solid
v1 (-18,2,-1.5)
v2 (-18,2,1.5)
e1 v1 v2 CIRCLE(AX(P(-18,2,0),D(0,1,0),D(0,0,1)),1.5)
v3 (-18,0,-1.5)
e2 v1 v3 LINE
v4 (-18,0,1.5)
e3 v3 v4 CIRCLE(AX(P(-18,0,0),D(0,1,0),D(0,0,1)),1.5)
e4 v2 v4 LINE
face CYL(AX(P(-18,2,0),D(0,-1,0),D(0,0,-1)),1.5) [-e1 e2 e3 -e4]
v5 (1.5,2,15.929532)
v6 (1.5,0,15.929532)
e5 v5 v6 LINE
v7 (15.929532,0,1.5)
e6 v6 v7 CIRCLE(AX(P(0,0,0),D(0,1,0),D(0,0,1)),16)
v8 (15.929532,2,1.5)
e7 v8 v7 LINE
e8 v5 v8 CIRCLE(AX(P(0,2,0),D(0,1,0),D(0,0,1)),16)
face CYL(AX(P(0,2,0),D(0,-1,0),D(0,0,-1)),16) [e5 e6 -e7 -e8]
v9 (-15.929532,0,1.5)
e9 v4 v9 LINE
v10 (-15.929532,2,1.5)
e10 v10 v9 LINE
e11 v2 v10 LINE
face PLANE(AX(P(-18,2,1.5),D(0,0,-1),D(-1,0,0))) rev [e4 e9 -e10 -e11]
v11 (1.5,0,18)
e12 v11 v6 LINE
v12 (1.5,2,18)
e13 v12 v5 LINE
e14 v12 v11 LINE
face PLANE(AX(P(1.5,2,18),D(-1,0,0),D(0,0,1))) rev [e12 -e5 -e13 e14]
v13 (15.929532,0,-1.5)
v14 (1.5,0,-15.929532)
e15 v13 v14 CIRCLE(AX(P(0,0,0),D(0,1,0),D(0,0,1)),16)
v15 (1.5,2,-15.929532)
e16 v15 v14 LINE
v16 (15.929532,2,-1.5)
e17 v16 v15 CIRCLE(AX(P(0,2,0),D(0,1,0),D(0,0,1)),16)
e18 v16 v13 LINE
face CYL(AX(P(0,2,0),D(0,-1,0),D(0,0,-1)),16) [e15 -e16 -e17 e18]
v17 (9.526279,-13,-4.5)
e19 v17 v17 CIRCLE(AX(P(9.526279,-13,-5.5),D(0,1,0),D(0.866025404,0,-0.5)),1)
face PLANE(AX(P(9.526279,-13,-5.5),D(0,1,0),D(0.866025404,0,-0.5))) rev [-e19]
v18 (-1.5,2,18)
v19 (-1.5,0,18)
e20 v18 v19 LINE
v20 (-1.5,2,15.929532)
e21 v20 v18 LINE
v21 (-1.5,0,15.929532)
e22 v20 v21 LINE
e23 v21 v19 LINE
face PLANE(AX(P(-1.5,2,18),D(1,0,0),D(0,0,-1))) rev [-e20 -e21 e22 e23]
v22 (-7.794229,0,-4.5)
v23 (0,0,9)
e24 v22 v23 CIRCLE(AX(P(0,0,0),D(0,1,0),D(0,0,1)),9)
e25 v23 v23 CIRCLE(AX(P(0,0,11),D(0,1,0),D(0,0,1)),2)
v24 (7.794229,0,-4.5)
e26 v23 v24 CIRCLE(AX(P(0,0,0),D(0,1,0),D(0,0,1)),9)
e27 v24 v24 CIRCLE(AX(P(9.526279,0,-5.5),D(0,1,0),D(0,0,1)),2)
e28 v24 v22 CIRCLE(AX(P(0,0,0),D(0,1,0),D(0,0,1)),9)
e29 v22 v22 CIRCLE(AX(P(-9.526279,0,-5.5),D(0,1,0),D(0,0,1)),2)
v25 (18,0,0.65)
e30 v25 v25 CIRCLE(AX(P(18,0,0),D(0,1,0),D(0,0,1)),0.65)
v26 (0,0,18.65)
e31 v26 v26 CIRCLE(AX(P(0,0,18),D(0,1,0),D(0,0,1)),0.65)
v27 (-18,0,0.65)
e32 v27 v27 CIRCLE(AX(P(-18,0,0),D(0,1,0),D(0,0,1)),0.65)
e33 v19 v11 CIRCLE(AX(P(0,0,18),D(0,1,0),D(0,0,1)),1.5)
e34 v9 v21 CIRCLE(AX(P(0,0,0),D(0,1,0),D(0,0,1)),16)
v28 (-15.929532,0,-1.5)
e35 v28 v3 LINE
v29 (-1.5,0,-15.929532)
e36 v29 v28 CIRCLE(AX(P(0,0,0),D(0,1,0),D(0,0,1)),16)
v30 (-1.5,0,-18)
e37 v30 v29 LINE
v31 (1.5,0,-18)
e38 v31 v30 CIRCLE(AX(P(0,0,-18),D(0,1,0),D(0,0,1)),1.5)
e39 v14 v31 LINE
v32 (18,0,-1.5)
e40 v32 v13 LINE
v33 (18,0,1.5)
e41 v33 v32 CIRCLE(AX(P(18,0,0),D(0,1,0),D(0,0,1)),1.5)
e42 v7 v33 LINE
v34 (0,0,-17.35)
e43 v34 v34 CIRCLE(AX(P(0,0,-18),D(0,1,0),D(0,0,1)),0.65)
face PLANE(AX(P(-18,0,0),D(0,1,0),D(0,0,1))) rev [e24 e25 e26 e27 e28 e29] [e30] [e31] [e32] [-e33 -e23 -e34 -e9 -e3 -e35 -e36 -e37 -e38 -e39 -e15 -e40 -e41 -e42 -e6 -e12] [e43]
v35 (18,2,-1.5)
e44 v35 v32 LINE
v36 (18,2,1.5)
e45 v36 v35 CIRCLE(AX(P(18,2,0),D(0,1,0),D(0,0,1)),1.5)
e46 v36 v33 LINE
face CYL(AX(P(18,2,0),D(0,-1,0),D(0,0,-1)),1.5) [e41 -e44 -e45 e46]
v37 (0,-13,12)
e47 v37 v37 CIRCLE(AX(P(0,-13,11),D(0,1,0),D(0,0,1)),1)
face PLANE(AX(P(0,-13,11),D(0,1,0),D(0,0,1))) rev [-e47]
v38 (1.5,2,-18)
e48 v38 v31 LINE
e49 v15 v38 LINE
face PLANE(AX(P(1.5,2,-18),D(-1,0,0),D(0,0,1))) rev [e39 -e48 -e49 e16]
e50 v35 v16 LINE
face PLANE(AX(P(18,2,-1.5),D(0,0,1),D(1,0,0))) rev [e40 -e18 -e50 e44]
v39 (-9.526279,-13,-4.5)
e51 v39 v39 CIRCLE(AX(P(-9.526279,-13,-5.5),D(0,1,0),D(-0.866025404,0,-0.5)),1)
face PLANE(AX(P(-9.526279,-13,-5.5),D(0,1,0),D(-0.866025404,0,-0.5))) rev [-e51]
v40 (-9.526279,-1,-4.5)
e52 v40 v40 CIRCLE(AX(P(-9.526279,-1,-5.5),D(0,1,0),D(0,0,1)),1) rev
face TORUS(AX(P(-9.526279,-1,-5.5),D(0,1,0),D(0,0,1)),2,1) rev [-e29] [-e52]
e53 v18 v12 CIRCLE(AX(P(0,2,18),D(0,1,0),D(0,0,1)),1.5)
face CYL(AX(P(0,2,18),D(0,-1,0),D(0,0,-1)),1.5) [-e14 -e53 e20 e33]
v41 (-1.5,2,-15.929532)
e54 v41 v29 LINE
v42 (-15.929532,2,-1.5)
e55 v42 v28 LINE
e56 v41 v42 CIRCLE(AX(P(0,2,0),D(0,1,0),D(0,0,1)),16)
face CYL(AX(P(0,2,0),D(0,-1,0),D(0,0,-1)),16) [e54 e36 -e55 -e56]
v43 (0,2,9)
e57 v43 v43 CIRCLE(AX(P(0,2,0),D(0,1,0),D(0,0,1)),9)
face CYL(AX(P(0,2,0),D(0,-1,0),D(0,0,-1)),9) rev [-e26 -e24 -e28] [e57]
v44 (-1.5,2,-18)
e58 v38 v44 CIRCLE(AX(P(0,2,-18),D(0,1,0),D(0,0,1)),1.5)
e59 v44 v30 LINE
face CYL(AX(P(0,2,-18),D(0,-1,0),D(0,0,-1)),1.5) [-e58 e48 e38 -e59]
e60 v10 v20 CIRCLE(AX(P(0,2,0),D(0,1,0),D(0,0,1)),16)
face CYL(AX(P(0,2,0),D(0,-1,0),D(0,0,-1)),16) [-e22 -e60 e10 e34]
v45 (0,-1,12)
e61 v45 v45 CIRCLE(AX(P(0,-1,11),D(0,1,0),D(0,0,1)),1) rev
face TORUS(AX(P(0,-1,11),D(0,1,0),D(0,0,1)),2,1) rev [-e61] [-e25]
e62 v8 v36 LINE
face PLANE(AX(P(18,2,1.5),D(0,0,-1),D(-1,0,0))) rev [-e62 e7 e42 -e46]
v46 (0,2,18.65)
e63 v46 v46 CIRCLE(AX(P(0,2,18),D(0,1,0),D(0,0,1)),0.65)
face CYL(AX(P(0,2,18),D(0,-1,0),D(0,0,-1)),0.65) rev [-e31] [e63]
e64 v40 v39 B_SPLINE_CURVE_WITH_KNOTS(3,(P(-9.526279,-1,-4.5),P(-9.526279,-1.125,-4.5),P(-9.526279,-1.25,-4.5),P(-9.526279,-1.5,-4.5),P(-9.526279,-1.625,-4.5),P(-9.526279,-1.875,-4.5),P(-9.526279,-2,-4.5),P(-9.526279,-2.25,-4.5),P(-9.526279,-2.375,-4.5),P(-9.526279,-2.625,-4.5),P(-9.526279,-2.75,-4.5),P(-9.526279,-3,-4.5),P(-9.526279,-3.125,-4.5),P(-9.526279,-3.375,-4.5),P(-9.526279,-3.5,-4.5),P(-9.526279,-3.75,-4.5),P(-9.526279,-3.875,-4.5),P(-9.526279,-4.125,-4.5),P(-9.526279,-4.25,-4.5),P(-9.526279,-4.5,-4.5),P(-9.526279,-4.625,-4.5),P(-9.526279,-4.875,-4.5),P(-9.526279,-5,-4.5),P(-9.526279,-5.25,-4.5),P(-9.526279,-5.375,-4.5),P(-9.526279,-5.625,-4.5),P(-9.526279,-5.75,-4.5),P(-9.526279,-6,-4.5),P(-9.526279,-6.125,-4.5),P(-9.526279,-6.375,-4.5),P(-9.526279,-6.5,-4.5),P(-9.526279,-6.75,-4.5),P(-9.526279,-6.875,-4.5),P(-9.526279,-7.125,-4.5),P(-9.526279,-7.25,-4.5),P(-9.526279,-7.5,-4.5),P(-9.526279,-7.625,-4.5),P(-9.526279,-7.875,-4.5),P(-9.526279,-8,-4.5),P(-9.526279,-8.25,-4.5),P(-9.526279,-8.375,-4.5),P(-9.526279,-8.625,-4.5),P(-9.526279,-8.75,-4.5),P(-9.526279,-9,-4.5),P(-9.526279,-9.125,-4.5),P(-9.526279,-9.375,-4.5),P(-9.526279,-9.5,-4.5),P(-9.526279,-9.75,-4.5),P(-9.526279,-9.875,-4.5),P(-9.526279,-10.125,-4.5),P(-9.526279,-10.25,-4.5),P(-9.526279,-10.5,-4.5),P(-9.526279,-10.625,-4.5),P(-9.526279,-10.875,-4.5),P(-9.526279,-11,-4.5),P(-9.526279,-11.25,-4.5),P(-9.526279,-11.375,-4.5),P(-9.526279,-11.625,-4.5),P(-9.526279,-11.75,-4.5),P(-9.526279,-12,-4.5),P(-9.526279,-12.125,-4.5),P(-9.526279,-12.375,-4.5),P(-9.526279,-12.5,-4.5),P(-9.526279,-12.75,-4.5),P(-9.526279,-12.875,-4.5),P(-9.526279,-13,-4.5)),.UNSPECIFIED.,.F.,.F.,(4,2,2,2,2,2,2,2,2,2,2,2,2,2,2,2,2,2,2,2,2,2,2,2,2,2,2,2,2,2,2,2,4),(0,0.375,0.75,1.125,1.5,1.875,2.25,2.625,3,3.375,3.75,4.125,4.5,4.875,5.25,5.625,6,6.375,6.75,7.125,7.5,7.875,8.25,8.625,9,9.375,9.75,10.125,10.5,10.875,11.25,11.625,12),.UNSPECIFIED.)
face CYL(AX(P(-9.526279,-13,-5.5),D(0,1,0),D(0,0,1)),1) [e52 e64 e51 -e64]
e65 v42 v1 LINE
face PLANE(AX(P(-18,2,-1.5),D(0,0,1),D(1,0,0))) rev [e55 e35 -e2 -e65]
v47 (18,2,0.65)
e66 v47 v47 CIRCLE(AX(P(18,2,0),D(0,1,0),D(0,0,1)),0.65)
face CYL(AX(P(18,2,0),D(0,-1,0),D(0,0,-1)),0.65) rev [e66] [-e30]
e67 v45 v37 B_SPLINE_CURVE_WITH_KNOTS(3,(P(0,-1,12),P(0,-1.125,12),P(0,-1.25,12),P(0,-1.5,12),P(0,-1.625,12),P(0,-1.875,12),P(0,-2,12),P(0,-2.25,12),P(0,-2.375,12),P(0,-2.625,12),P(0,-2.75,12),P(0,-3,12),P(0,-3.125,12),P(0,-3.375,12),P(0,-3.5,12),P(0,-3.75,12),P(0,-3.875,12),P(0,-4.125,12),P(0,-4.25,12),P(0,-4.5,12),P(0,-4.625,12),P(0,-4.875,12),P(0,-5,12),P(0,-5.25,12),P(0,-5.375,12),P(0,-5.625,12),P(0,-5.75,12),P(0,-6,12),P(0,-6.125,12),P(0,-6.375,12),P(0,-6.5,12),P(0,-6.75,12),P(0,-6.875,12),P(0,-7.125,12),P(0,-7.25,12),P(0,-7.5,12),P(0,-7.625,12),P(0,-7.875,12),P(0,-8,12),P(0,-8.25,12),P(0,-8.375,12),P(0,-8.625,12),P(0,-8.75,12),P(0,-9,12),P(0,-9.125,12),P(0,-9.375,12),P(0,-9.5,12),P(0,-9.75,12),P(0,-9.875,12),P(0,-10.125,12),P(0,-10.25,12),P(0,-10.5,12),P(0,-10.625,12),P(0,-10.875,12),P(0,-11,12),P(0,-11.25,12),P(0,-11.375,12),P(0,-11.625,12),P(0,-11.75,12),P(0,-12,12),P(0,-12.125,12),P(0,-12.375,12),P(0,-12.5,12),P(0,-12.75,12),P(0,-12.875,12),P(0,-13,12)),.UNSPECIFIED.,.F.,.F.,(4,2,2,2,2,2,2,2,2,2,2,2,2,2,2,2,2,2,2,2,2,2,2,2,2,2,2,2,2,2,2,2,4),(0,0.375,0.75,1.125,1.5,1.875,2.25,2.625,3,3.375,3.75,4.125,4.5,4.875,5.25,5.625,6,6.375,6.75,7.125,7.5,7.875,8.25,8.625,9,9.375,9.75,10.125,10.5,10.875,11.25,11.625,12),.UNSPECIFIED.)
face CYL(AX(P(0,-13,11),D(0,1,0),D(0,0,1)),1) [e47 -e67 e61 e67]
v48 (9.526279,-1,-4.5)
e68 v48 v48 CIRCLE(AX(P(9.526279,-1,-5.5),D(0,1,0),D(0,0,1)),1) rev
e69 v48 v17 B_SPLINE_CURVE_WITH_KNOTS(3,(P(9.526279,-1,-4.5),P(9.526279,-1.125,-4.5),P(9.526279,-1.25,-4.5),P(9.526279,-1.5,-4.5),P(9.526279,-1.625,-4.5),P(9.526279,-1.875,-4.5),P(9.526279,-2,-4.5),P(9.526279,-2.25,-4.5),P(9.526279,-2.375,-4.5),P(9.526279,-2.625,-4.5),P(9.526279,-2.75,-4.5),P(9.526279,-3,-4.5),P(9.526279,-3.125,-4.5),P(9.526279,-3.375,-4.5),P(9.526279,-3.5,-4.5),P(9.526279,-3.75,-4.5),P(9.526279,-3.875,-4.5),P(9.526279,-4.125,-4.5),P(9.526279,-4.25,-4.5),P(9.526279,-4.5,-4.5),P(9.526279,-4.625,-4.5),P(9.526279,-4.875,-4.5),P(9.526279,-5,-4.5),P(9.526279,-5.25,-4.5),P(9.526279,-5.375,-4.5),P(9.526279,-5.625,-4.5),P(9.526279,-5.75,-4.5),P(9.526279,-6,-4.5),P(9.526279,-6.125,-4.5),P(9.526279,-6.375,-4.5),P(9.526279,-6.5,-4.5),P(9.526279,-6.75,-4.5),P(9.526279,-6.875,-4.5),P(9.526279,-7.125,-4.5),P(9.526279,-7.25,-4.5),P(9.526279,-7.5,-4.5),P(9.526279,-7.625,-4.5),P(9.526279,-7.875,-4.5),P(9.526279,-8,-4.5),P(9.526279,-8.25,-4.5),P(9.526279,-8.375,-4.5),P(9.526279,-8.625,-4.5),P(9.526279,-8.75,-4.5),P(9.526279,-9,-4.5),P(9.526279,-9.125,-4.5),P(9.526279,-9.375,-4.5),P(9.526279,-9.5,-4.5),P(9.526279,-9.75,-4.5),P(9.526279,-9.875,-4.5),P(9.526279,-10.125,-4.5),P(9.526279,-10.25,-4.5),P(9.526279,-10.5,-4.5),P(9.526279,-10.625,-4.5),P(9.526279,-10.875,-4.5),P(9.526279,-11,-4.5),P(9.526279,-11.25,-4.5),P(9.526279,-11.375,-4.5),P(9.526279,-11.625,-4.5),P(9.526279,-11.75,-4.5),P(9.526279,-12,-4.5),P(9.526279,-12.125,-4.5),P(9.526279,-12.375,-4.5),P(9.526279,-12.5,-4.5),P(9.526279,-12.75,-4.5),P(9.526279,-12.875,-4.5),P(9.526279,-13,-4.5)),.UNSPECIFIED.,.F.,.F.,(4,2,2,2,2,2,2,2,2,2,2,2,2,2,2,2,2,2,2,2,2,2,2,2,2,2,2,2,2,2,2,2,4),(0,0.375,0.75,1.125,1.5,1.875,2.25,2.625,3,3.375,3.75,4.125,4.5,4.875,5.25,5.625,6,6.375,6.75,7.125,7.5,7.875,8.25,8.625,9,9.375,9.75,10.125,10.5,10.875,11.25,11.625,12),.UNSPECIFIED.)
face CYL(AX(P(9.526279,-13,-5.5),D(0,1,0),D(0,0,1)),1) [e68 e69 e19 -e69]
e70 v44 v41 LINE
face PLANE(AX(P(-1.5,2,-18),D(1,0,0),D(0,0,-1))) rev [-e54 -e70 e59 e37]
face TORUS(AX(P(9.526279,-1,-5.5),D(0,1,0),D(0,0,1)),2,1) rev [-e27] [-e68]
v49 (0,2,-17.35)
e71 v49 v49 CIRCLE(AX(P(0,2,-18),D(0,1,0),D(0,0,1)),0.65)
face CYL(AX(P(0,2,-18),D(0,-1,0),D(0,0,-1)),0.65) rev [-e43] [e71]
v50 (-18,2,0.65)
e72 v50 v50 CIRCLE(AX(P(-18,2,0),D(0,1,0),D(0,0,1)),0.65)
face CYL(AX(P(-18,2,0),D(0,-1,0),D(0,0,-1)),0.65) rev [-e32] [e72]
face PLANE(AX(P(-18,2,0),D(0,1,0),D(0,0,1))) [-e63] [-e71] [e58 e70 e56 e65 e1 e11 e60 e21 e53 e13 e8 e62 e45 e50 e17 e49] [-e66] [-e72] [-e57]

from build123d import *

# Parameters (mm, degrees)
SKETCH1_R           = 1
BOSS_EXTRUDE1_DEPTH = 13
SKETCH2_R           = 9
SKETCH2_R_2         = 0.65
BOSS_EXTRUDE2_DEPTH = 2
CIRPATTERN2_COUNT   = 3
FILLET1_R           = 1


with BuildPart() as part:
    # Sketch1 → Boss-Extrude1 (new body)
    with BuildSketch(Plane(origin=(0, 0, 0), x_dir=(1, 0, 0), z_dir=(0, 1, 0))):
        with Locations(Location((0, -11, 0), (0, 0, 270))):
            Circle(SKETCH1_R)
    boss_extrude1 = extrude(amount=-BOSS_EXTRUDE1_DEPTH)

    # Sketch2 → Boss-Extrude2 (add)
    with BuildSketch(Plane(origin=(0, 0, 0), x_dir=(1, 0, 0), z_dir=(0, 1, 0))):
        with BuildLine():
            Line((-18, 1.5), (-15.929532322, 1.5))
            ThreePointArc((-15.929532322, 1.5), (-11.313708499, 11.313708499), (-1.5, 15.929532322))
            Line((-1.5, 15.929532322), (-1.5, 18))
            ThreePointArc((-1.5, 18), (0, 19.5), (1.5, 18))
            Line((1.5, 18), (1.5, 15.929532322))
            ThreePointArc((1.5, 15.929532322), (11.313708499, 11.313708499), (15.929532322, 1.5))
            Line((15.929532322, 1.5), (18, 1.5))
            ThreePointArc((18, 1.5), (19.5, 0), (18, -1.5))
            Line((18, -1.5), (15.929532322, -1.5))
            ThreePointArc((15.929532322, -1.5), (11.313708499, -11.313708499), (1.5, -15.929532322))
            Line((1.5, -15.929532322), (1.5, -18))
            ThreePointArc((1.5, -18), (0, -19.5), (-1.5, -18))
            Line((-1.5, -18), (-1.5, -15.929532322))
            ThreePointArc((-1.5, -15.929532322), (-11.313708499, -11.313708499), (-15.929532322, -1.5))
            Line((-15.929532322, -1.5), (-18, -1.5))
            ThreePointArc((-18, -1.5), (-19.5, 0), (-18, 1.5))
        make_face()
        with Locations(Location((0, 0, 0), (0, 0, 270))):
            Circle(SKETCH2_R, mode=Mode.SUBTRACT)
        with Locations(Location((0, 18, 0), (0, 0, 270))):
            Circle(SKETCH2_R_2, mode=Mode.SUBTRACT)
        with Locations(Location((18, 0, 0), (0, 0, 270))):
            Circle(SKETCH2_R_2, mode=Mode.SUBTRACT)
        with Locations(Location((-18, 0, 0), (0, 0, 270))):
            Circle(SKETCH2_R_2, mode=Mode.SUBTRACT)
        with Locations(Location((0, -18, 0), (0, 0, 270))):
            Circle(SKETCH2_R_2, mode=Mode.SUBTRACT)
    extrude(amount=BOSS_EXTRUDE2_DEPTH)

    # CirPattern2: Boss-Extrude1 ×3 about axis
    cirpattern2_axis = Axis((0, 0, 0), (0, 1, 0))
    for i in range(1, CIRPATTERN2_COUNT):
        add(boss_extrude1.rotate(cirpattern2_axis, i * 360 / CIRPATTERN2_COUNT))

    # Fillet1
    fillet1_edges = [part.edges().sort_by_distance(p)[0] for p in [
        (0, 0, 10),
        (8.660254038, 0, -5),
        (-8.660254038, 0, -5),
    ]]
    fillet(fillet1_edges, radius=FILLET1_R - 0.0001)  # a hair under: the kernel refuses the full size


solid = part.part
